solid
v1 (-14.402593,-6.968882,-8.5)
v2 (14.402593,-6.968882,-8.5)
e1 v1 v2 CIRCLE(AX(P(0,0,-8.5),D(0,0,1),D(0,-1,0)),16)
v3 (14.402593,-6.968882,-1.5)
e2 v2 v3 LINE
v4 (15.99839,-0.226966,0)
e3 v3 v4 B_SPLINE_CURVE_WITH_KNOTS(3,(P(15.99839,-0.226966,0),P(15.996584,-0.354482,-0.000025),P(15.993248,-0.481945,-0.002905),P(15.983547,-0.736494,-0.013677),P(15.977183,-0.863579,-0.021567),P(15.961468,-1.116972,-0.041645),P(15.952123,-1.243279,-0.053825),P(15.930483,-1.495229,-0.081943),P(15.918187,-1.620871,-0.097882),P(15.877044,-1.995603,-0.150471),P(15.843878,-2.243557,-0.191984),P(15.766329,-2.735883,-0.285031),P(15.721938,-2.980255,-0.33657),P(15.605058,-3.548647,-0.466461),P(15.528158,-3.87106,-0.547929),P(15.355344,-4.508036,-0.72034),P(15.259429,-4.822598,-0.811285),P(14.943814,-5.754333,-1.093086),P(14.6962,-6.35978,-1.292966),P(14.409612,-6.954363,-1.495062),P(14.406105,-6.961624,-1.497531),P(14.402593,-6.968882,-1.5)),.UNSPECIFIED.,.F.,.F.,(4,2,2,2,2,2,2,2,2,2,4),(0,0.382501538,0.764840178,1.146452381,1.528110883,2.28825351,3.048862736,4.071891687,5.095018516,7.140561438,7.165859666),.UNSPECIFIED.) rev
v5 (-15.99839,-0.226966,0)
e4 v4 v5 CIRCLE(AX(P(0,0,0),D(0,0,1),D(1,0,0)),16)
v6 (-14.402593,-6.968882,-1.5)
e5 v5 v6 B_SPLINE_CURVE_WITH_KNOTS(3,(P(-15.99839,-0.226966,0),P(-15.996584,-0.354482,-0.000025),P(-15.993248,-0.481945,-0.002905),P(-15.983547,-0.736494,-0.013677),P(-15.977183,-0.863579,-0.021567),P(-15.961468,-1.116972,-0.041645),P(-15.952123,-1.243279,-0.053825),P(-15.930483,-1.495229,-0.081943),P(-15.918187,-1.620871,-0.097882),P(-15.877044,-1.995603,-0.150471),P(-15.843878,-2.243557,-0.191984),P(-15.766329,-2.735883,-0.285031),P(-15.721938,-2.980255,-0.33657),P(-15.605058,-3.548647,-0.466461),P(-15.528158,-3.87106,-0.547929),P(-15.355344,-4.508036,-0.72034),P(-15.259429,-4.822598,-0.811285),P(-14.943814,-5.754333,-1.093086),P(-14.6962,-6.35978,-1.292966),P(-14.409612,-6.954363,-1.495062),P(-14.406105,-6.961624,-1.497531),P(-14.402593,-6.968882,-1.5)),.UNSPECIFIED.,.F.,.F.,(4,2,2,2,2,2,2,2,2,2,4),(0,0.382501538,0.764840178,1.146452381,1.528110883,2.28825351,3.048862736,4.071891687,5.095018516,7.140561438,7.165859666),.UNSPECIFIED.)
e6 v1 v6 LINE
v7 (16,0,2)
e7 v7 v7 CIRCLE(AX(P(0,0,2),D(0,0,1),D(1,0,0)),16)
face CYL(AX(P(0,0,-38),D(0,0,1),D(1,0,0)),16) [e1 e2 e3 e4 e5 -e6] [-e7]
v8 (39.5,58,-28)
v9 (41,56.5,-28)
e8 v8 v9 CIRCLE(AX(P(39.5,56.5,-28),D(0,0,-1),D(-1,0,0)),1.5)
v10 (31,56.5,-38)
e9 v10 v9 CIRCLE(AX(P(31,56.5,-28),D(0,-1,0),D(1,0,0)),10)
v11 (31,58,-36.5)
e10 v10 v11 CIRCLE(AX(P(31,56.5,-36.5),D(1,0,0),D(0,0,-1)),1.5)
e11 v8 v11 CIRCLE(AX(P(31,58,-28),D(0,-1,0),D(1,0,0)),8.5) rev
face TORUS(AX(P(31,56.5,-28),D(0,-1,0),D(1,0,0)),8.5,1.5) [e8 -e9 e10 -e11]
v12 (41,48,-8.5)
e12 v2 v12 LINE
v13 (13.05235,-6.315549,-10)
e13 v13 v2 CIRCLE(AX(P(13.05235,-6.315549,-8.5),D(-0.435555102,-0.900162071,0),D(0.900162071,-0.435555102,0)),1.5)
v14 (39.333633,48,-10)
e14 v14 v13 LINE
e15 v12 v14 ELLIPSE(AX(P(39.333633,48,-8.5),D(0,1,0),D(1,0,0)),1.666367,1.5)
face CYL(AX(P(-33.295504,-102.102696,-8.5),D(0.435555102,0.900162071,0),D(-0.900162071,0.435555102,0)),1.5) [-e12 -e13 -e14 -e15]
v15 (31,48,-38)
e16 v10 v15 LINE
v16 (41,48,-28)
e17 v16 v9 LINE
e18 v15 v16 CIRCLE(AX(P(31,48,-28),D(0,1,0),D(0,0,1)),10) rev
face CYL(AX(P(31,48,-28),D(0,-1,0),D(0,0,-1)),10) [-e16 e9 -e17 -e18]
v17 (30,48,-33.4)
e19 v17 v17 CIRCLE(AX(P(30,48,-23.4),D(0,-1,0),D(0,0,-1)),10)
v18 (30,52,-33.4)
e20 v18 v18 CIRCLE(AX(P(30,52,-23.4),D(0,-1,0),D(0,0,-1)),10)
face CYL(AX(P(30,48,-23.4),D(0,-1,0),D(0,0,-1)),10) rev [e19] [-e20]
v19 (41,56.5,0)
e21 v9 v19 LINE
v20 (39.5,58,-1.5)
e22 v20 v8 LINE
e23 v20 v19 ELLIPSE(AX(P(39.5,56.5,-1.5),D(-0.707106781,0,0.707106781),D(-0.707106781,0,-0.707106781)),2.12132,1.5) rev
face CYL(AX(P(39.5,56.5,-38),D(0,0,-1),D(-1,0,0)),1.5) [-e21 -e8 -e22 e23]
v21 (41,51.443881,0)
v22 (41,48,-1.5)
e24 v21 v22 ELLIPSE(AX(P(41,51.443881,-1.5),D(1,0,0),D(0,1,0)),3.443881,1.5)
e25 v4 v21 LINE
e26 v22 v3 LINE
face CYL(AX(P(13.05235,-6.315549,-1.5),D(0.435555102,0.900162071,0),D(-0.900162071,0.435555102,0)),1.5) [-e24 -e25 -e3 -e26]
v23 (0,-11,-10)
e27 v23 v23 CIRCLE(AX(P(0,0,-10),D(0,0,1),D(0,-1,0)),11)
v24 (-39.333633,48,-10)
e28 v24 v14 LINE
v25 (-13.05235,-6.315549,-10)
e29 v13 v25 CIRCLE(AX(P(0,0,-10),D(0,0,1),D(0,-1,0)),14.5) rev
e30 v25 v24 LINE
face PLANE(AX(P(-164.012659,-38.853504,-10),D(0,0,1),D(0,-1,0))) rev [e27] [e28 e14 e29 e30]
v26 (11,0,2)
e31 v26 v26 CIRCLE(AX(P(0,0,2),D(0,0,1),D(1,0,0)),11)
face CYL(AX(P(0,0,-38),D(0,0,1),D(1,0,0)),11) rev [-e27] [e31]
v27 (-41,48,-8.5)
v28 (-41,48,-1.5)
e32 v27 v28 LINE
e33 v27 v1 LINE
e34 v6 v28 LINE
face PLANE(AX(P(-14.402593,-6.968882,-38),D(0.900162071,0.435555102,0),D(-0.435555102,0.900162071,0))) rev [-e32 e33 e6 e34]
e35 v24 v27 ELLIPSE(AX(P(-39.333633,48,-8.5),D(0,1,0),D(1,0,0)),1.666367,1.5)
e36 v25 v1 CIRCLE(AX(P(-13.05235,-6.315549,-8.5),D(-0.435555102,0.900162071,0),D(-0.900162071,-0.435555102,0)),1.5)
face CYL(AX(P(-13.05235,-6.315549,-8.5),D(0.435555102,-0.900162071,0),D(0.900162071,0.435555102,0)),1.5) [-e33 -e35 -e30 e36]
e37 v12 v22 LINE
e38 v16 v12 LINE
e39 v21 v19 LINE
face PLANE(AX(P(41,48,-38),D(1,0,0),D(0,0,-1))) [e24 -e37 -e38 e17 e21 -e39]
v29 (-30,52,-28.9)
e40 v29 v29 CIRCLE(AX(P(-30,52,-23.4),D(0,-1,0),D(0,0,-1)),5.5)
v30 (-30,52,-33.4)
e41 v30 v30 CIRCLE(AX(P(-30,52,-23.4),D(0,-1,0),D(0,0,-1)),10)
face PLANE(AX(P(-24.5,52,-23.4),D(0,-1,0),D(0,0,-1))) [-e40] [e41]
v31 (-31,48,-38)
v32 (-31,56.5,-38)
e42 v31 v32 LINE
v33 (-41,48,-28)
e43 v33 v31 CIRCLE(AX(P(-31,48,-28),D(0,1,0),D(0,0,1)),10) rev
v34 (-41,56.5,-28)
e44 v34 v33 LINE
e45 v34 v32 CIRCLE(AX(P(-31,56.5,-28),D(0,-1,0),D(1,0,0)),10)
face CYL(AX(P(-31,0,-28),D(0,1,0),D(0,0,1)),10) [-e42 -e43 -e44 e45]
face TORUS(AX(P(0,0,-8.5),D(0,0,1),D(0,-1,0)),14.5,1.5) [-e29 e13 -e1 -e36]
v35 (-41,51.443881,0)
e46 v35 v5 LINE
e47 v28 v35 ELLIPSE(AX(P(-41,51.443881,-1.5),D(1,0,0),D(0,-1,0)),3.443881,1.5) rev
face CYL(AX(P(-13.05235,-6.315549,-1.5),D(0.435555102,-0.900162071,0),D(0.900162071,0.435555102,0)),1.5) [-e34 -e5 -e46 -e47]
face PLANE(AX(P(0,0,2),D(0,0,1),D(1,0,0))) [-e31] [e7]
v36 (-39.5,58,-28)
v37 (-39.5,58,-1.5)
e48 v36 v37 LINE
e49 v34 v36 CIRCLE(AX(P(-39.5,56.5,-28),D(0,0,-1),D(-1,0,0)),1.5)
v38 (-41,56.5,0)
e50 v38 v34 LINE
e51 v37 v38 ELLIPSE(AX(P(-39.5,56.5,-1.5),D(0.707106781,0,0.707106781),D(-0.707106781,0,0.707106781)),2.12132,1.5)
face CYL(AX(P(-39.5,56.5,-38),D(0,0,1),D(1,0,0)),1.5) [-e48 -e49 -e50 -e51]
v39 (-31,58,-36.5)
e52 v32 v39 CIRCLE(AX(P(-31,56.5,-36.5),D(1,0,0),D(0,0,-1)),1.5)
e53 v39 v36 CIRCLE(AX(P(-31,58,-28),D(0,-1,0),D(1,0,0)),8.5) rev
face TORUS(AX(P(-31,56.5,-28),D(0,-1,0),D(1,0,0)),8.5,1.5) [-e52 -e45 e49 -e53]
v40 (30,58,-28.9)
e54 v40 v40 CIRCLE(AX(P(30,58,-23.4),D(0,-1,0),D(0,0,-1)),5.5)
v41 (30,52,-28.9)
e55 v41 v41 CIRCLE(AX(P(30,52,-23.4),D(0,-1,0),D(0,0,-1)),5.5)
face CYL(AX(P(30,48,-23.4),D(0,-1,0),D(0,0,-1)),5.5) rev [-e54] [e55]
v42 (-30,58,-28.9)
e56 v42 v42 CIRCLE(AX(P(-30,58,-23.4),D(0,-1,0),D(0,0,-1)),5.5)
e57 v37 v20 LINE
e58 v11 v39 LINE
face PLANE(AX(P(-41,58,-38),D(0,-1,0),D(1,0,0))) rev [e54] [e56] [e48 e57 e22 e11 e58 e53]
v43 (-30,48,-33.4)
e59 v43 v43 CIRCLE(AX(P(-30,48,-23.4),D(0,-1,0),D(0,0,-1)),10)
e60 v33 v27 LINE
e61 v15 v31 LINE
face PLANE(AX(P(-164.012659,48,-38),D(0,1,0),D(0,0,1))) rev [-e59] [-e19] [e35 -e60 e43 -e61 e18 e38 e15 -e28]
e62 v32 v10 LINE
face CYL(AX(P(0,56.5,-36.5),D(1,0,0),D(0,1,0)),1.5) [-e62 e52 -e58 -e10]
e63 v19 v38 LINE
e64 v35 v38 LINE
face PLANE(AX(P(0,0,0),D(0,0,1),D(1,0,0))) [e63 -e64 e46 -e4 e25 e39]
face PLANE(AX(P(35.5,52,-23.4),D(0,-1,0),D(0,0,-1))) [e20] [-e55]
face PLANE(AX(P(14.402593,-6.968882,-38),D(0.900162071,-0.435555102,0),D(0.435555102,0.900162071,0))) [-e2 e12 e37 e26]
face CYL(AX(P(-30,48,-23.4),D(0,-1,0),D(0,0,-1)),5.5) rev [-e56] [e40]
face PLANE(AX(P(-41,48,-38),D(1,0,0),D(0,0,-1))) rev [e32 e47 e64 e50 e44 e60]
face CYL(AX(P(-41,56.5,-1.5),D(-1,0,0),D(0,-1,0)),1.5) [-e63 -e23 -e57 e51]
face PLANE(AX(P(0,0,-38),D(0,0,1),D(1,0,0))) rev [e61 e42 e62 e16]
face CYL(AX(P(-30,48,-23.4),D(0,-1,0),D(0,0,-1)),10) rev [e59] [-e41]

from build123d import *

# Parameters (mm, degrees)
BASE_EXTRUDE_DEPTH      = 38
CUT_EXTRUDE1_DEPTH      = 81.554329493
CUT_EXTRUDE1_DEPTH_BACK = 41
HOLE2_OUTLINE_R         = 11
HOLE2_DEPTH             = 2
HOLE2_START             = -10
HOLE2_2_OUTLINE_R       = 11
HOLE2_2_DEPTH           = 10
HOLE2_START_2           = 48
HOLE2_3_OUTLINE_R       = 10
HOLE2_3_DEPTH           = 4
HOLE2_START_3           = 52
HOLE2_4_OUTLINE_R       = 5.5
HOLE2_4_DEPTH           = 6
FILLET1_R               = 10
FILLET7_R               = 1.5


with BuildPart() as part:
    # Sketch2 → Base-Extrude (new body)
    with BuildSketch(Plane.XY):
        with BuildLine():
            Line((-14.402593128, -6.96888163), (-41, 48))
            Line((-41, 48), (-41, 58))
            Line((-41, 58), (41, 58))
            Line((41, 58), (41, 48))
            Line((41, 48), (14.402593128, -6.96888163))
            ThreePointArc((14.402593128, -6.96888163), (0, -16), (-14.402593128, -6.96888163))
        make_face()
    extrude(amount=-BASE_EXTRUDE_DEPTH)

    # Sketch3 → Cut-Extrude1 (cut, two sides: drawn at the far end of the back side and taken through both)
    with BuildSketch(Plane(origin=(0, 0, 0), x_dir=(0, 0, -1), z_dir=(1, 0, 0)).offset(-CUT_EXTRUDE1_DEPTH_BACK)):
        Polygon((10, -250.492798217), (10, -38.853504021), (10, 48), (38, 48), (249.639294197, 48), (579.708021452, -216.989431263), (340.068727255, -515.482229481), align=None)
    extrude(amount=CUT_EXTRUDE1_DEPTH + CUT_EXTRUDE1_DEPTH_BACK, mode=Mode.SUBTRACT)

    # Hole2: read off the stored shape, not the designer's step
    # Hole2 outline → Hole2 (add)
    with BuildSketch(Plane.XY):
        with BuildLine():
            ThreePointArc((14.402593128, -6.96888163), (0, 16), (-14.402593128, -6.96888163))
            ThreePointArc((-14.402593128, -6.96888163), (0, -16), (14.402593128, -6.96888163))
        make_face()
        Circle(HOLE2_OUTLINE_R, mode=Mode.SUBTRACT)
    hole2 = extrude(amount=HOLE2_DEPTH)

    # Hole2 2 outline → Hole2 2 (cut)
    with BuildSketch(Plane.XY.offset(HOLE2_START)):
        Circle(HOLE2_2_OUTLINE_R)
    hole2_2 = extrude(amount=HOLE2_2_DEPTH, mode=Mode.SUBTRACT)

    # Hole2 3 outline → Hole2 3 (cut)
    with BuildSketch(Plane(origin=(0, 0, 0), x_dir=(1, 0, 0), z_dir=(0, 1, 0)).offset(HOLE2_START_2)):
        with Locations((30, 23.4)):
            Circle(HOLE2_3_OUTLINE_R)
    hole2_3 = extrude(amount=HOLE2_3_DEPTH, mode=Mode.SUBTRACT)

    # Hole2 4 outline → Hole2 4 (cut)
    with BuildSketch(Plane(origin=(0, 0, 0), x_dir=(1, 0, 0), z_dir=(0, 1, 0)).offset(HOLE2_START_3)):
        with Locations((30, 23.4)):
            Circle(HOLE2_4_OUTLINE_R)
    hole2_4 = extrude(amount=HOLE2_4_DEPTH, mode=Mode.SUBTRACT)

    # Mirror1: Hole2, Hole2 2, Hole2 3, Hole2 4 across plane
    add(hole2.mirror(Plane(origin=(0, 0, 0), x_dir=(0, 0, 1), z_dir=(1, 0, 0))))
    add(hole2_2.mirror(Plane(origin=(0, 0, 0), x_dir=(0, 0, 1), z_dir=(1, 0, 0))), mode=Mode.SUBTRACT)
    add(hole2_3.mirror(Plane(origin=(0, 0, 0), x_dir=(0, 0, 1), z_dir=(1, 0, 0))), mode=Mode.SUBTRACT)
    add(hole2_4.mirror(Plane(origin=(0, 0, 0), x_dir=(0, 0, 1), z_dir=(1, 0, 0))), mode=Mode.SUBTRACT)

    # Fillet1
    fillet1_edges = [part.edges().sort_by_distance(p)[0] for p in [
        (41, 53, -38),
        (-41, 53, -38),
    ]]
    fillet(fillet1_edges, radius=FILLET1_R)

    # Fillet7
    # the kernel refuses this fillet: 1.5 mm, written as the material it takes off along each edge
    with BuildSketch(Plane(origin=(14.402593128, -6.96888163, -10), x_dir=(-0.9001620705215131, 0.43555510190379193, 0), z_dir=(0.435555101903792, 0.9001620705215131, 0))) as fillet7_piece_1_section:
        with BuildLine():
            CenterArc((FILLET7_R, FILLET7_R), FILLET7_R, 180, 90)
            Line((0, FILLET7_R), (0, 0))
            Line((0, 0), (FILLET7_R, 0))
        make_face()
    fillet7_piece_1 = extrude(amount=64.815538563, mode=Mode.PRIVATE)
    fillet7_piece_1 = split(fillet7_piece_1, bisect_by=Plane(origin=(14.402593128, 48, -10), z_dir=(0, -1, 0)), keep=Keep.TOP, mode=Mode.PRIVATE)
    add(fillet7_piece_1, mode=Mode.SUBTRACT)
    with BuildSketch(Plane(origin=(0, 0, -10), x_dir=(-0.9001620705215129, -0.4355551019037922, 0), z_dir=(-0.4355551019037922, 0.9001620705215129, 0))) as fillet7_piece_2:
        with BuildLine():
            CenterArc((16 - FILLET7_R, FILLET7_R), FILLET7_R, 270, 90)
            Line((16, FILLET7_R), (16, 0))
            Line((16, 0), (16 - FILLET7_R, 0))
        make_face()
    revolve(axis=Axis((0, 0, -10), (0, 0, 1)), revolution_arc=128.358757734, mode=Mode.SUBTRACT)
    with BuildSketch(Plane(origin=(-42.633331632, 51.375607764, -10), x_dir=(0, 0, 1), z_dir=(0.4355551019037922, -0.900162070521513, 0))) as fillet7_piece_3_section:
        with BuildLine():
            CenterArc((FILLET7_R, -FILLET7_R), FILLET7_R, 90, 90)
            Line((0, -FILLET7_R), (0, 0))
            Line((0, 0), (FILLET7_R, 0))
        make_face()
    fillet7_piece_3 = extrude(amount=64.815538563, mode=Mode.PRIVATE)
    fillet7_piece_3 = split(fillet7_piece_3, bisect_by=Plane(origin=(-42.633331632, 48, -10), z_dir=(0, -1, 0)), keep=Keep.TOP, mode=Mode.PRIVATE)
    add(fillet7_piece_3, mode=Mode.SUBTRACT)
    with BuildSketch(Plane(origin=(-31, 58, -38), x_dir=(0, 0, 1), z_dir=(1, 0, 0))) as fillet7_piece_4:
        with BuildLine():
            CenterArc((FILLET7_R, FILLET7_R), FILLET7_R, 180, 90)
            Line((0, FILLET7_R), (0, 0))
            Line((0, 0), (FILLET7_R, 0))
        make_face()
    extrude(amount=62, mode=Mode.SUBTRACT)
    with BuildSketch(Plane(origin=(41, 58, 3.75), x_dir=(-1, 0, 0), z_dir=(0, 0, -1)), Plane(origin=(-41, 58, 3.75), x_dir=(0, -1, 0), z_dir=(0, 0, -1))) as fillet7_piece_5:
        with BuildLine():
            CenterArc((FILLET7_R, -FILLET7_R), FILLET7_R, 90, 90)
            Line((0, -FILLET7_R), (0, 0))
            Line((0, 0), (FILLET7_R, 0))
        make_face()
    extrude(amount=31.75, mode=Mode.SUBTRACT)
    with BuildSketch(Plane(origin=(31, 58, -28), x_dir=(1, 0, 0), z_dir=(0, 0, 1))) as fillet7_piece_6:
        with BuildLine():
            CenterArc((10 - FILLET7_R, -FILLET7_R), FILLET7_R, 360, 90)
            Line((10, -FILLET7_R), (10, 0))
            Line((10, 0), (10 - FILLET7_R, 0))
        make_face()
    revolve(axis=Axis((31, 58, -28), (0, 1, 0)), revolution_arc=90, mode=Mode.SUBTRACT)
    with BuildSketch(Plane(origin=(-31, 58, -28), x_dir=(-1, 0, 0), z_dir=(0, 0, 1))) as fillet7_piece_7:
        with BuildLine():
            CenterArc((10 - FILLET7_R, FILLET7_R), FILLET7_R, 270, 90)
            Line((10 - FILLET7_R, 0), (10, 0))
            Line((10, 0), (10, FILLET7_R))
        make_face()
    revolve(axis=Axis((-31, 58, -28), (0, -1, 0)), revolution_arc=90, mode=Mode.SUBTRACT)
    with BuildSketch(Plane(origin=(-9.502598232, -17.095704924, 0), x_dir=(0, 0, -1), z_dir=(-0.4355551019037922, 0.900162070521513, 0))) as fillet7_piece_8_section:
        with BuildLine():
            CenterArc((FILLET7_R, -FILLET7_R), FILLET7_R, 90, 90)
            Line((0, -FILLET7_R), (0, 0))
            Line((0, 0), (FILLET7_R, 0))
        make_face()
    fillet7_piece_8 = extrude(amount=76.065538563, mode=Mode.PRIVATE)
    fillet7_piece_8 = fillet7_piece_8 - Plane(origin=(0, 0, 0), x_dir=(0.9001620705200065, -0.4355551019069058, 0), z_dir=(0, 0, -1)) * Cylinder(16, 159, mode=Mode.PRIVATE)
    add(fillet7_piece_8, mode=Mode.SUBTRACT)
    with BuildSketch(Plane(origin=(-44.75, 58, 0), x_dir=(0, 0, -1), z_dir=(1, 0, 0))) as fillet7_piece_9:
        with BuildLine():
            CenterArc((FILLET7_R, -FILLET7_R), FILLET7_R, 90, 90)
            Line((0, -FILLET7_R), (0, 0))
            Line((0, 0), (FILLET7_R, 0))
        make_face()
    extrude(amount=89.5, mode=Mode.SUBTRACT)
    with BuildSketch(Plane(origin=(42.633331632, 51.375607764, 0), x_dir=(-0.900162070521513, 0.4355551019037919, 0), z_dir=(-0.435555101903792, -0.9001620705215131, 0))) as fillet7_piece_10_section:
        with BuildLine():
            CenterArc((FILLET7_R, FILLET7_R), FILLET7_R, 180, 90)
            Line((0, FILLET7_R), (0, 0))
            Line((0, 0), (FILLET7_R, 0))
        make_face()
    fillet7_piece_10 = extrude(amount=76.065538563, mode=Mode.PRIVATE)
    fillet7_piece_10 = fillet7_piece_10 - Plane(origin=(0, 0, 0), x_dir=(0.9001620705200065, -0.4355551019069058, 0), z_dir=(0, 0, -1)) * Cylinder(16, 159, mode=Mode.PRIVATE)
    add(fillet7_piece_10, mode=Mode.SUBTRACT)


solid = part.part
